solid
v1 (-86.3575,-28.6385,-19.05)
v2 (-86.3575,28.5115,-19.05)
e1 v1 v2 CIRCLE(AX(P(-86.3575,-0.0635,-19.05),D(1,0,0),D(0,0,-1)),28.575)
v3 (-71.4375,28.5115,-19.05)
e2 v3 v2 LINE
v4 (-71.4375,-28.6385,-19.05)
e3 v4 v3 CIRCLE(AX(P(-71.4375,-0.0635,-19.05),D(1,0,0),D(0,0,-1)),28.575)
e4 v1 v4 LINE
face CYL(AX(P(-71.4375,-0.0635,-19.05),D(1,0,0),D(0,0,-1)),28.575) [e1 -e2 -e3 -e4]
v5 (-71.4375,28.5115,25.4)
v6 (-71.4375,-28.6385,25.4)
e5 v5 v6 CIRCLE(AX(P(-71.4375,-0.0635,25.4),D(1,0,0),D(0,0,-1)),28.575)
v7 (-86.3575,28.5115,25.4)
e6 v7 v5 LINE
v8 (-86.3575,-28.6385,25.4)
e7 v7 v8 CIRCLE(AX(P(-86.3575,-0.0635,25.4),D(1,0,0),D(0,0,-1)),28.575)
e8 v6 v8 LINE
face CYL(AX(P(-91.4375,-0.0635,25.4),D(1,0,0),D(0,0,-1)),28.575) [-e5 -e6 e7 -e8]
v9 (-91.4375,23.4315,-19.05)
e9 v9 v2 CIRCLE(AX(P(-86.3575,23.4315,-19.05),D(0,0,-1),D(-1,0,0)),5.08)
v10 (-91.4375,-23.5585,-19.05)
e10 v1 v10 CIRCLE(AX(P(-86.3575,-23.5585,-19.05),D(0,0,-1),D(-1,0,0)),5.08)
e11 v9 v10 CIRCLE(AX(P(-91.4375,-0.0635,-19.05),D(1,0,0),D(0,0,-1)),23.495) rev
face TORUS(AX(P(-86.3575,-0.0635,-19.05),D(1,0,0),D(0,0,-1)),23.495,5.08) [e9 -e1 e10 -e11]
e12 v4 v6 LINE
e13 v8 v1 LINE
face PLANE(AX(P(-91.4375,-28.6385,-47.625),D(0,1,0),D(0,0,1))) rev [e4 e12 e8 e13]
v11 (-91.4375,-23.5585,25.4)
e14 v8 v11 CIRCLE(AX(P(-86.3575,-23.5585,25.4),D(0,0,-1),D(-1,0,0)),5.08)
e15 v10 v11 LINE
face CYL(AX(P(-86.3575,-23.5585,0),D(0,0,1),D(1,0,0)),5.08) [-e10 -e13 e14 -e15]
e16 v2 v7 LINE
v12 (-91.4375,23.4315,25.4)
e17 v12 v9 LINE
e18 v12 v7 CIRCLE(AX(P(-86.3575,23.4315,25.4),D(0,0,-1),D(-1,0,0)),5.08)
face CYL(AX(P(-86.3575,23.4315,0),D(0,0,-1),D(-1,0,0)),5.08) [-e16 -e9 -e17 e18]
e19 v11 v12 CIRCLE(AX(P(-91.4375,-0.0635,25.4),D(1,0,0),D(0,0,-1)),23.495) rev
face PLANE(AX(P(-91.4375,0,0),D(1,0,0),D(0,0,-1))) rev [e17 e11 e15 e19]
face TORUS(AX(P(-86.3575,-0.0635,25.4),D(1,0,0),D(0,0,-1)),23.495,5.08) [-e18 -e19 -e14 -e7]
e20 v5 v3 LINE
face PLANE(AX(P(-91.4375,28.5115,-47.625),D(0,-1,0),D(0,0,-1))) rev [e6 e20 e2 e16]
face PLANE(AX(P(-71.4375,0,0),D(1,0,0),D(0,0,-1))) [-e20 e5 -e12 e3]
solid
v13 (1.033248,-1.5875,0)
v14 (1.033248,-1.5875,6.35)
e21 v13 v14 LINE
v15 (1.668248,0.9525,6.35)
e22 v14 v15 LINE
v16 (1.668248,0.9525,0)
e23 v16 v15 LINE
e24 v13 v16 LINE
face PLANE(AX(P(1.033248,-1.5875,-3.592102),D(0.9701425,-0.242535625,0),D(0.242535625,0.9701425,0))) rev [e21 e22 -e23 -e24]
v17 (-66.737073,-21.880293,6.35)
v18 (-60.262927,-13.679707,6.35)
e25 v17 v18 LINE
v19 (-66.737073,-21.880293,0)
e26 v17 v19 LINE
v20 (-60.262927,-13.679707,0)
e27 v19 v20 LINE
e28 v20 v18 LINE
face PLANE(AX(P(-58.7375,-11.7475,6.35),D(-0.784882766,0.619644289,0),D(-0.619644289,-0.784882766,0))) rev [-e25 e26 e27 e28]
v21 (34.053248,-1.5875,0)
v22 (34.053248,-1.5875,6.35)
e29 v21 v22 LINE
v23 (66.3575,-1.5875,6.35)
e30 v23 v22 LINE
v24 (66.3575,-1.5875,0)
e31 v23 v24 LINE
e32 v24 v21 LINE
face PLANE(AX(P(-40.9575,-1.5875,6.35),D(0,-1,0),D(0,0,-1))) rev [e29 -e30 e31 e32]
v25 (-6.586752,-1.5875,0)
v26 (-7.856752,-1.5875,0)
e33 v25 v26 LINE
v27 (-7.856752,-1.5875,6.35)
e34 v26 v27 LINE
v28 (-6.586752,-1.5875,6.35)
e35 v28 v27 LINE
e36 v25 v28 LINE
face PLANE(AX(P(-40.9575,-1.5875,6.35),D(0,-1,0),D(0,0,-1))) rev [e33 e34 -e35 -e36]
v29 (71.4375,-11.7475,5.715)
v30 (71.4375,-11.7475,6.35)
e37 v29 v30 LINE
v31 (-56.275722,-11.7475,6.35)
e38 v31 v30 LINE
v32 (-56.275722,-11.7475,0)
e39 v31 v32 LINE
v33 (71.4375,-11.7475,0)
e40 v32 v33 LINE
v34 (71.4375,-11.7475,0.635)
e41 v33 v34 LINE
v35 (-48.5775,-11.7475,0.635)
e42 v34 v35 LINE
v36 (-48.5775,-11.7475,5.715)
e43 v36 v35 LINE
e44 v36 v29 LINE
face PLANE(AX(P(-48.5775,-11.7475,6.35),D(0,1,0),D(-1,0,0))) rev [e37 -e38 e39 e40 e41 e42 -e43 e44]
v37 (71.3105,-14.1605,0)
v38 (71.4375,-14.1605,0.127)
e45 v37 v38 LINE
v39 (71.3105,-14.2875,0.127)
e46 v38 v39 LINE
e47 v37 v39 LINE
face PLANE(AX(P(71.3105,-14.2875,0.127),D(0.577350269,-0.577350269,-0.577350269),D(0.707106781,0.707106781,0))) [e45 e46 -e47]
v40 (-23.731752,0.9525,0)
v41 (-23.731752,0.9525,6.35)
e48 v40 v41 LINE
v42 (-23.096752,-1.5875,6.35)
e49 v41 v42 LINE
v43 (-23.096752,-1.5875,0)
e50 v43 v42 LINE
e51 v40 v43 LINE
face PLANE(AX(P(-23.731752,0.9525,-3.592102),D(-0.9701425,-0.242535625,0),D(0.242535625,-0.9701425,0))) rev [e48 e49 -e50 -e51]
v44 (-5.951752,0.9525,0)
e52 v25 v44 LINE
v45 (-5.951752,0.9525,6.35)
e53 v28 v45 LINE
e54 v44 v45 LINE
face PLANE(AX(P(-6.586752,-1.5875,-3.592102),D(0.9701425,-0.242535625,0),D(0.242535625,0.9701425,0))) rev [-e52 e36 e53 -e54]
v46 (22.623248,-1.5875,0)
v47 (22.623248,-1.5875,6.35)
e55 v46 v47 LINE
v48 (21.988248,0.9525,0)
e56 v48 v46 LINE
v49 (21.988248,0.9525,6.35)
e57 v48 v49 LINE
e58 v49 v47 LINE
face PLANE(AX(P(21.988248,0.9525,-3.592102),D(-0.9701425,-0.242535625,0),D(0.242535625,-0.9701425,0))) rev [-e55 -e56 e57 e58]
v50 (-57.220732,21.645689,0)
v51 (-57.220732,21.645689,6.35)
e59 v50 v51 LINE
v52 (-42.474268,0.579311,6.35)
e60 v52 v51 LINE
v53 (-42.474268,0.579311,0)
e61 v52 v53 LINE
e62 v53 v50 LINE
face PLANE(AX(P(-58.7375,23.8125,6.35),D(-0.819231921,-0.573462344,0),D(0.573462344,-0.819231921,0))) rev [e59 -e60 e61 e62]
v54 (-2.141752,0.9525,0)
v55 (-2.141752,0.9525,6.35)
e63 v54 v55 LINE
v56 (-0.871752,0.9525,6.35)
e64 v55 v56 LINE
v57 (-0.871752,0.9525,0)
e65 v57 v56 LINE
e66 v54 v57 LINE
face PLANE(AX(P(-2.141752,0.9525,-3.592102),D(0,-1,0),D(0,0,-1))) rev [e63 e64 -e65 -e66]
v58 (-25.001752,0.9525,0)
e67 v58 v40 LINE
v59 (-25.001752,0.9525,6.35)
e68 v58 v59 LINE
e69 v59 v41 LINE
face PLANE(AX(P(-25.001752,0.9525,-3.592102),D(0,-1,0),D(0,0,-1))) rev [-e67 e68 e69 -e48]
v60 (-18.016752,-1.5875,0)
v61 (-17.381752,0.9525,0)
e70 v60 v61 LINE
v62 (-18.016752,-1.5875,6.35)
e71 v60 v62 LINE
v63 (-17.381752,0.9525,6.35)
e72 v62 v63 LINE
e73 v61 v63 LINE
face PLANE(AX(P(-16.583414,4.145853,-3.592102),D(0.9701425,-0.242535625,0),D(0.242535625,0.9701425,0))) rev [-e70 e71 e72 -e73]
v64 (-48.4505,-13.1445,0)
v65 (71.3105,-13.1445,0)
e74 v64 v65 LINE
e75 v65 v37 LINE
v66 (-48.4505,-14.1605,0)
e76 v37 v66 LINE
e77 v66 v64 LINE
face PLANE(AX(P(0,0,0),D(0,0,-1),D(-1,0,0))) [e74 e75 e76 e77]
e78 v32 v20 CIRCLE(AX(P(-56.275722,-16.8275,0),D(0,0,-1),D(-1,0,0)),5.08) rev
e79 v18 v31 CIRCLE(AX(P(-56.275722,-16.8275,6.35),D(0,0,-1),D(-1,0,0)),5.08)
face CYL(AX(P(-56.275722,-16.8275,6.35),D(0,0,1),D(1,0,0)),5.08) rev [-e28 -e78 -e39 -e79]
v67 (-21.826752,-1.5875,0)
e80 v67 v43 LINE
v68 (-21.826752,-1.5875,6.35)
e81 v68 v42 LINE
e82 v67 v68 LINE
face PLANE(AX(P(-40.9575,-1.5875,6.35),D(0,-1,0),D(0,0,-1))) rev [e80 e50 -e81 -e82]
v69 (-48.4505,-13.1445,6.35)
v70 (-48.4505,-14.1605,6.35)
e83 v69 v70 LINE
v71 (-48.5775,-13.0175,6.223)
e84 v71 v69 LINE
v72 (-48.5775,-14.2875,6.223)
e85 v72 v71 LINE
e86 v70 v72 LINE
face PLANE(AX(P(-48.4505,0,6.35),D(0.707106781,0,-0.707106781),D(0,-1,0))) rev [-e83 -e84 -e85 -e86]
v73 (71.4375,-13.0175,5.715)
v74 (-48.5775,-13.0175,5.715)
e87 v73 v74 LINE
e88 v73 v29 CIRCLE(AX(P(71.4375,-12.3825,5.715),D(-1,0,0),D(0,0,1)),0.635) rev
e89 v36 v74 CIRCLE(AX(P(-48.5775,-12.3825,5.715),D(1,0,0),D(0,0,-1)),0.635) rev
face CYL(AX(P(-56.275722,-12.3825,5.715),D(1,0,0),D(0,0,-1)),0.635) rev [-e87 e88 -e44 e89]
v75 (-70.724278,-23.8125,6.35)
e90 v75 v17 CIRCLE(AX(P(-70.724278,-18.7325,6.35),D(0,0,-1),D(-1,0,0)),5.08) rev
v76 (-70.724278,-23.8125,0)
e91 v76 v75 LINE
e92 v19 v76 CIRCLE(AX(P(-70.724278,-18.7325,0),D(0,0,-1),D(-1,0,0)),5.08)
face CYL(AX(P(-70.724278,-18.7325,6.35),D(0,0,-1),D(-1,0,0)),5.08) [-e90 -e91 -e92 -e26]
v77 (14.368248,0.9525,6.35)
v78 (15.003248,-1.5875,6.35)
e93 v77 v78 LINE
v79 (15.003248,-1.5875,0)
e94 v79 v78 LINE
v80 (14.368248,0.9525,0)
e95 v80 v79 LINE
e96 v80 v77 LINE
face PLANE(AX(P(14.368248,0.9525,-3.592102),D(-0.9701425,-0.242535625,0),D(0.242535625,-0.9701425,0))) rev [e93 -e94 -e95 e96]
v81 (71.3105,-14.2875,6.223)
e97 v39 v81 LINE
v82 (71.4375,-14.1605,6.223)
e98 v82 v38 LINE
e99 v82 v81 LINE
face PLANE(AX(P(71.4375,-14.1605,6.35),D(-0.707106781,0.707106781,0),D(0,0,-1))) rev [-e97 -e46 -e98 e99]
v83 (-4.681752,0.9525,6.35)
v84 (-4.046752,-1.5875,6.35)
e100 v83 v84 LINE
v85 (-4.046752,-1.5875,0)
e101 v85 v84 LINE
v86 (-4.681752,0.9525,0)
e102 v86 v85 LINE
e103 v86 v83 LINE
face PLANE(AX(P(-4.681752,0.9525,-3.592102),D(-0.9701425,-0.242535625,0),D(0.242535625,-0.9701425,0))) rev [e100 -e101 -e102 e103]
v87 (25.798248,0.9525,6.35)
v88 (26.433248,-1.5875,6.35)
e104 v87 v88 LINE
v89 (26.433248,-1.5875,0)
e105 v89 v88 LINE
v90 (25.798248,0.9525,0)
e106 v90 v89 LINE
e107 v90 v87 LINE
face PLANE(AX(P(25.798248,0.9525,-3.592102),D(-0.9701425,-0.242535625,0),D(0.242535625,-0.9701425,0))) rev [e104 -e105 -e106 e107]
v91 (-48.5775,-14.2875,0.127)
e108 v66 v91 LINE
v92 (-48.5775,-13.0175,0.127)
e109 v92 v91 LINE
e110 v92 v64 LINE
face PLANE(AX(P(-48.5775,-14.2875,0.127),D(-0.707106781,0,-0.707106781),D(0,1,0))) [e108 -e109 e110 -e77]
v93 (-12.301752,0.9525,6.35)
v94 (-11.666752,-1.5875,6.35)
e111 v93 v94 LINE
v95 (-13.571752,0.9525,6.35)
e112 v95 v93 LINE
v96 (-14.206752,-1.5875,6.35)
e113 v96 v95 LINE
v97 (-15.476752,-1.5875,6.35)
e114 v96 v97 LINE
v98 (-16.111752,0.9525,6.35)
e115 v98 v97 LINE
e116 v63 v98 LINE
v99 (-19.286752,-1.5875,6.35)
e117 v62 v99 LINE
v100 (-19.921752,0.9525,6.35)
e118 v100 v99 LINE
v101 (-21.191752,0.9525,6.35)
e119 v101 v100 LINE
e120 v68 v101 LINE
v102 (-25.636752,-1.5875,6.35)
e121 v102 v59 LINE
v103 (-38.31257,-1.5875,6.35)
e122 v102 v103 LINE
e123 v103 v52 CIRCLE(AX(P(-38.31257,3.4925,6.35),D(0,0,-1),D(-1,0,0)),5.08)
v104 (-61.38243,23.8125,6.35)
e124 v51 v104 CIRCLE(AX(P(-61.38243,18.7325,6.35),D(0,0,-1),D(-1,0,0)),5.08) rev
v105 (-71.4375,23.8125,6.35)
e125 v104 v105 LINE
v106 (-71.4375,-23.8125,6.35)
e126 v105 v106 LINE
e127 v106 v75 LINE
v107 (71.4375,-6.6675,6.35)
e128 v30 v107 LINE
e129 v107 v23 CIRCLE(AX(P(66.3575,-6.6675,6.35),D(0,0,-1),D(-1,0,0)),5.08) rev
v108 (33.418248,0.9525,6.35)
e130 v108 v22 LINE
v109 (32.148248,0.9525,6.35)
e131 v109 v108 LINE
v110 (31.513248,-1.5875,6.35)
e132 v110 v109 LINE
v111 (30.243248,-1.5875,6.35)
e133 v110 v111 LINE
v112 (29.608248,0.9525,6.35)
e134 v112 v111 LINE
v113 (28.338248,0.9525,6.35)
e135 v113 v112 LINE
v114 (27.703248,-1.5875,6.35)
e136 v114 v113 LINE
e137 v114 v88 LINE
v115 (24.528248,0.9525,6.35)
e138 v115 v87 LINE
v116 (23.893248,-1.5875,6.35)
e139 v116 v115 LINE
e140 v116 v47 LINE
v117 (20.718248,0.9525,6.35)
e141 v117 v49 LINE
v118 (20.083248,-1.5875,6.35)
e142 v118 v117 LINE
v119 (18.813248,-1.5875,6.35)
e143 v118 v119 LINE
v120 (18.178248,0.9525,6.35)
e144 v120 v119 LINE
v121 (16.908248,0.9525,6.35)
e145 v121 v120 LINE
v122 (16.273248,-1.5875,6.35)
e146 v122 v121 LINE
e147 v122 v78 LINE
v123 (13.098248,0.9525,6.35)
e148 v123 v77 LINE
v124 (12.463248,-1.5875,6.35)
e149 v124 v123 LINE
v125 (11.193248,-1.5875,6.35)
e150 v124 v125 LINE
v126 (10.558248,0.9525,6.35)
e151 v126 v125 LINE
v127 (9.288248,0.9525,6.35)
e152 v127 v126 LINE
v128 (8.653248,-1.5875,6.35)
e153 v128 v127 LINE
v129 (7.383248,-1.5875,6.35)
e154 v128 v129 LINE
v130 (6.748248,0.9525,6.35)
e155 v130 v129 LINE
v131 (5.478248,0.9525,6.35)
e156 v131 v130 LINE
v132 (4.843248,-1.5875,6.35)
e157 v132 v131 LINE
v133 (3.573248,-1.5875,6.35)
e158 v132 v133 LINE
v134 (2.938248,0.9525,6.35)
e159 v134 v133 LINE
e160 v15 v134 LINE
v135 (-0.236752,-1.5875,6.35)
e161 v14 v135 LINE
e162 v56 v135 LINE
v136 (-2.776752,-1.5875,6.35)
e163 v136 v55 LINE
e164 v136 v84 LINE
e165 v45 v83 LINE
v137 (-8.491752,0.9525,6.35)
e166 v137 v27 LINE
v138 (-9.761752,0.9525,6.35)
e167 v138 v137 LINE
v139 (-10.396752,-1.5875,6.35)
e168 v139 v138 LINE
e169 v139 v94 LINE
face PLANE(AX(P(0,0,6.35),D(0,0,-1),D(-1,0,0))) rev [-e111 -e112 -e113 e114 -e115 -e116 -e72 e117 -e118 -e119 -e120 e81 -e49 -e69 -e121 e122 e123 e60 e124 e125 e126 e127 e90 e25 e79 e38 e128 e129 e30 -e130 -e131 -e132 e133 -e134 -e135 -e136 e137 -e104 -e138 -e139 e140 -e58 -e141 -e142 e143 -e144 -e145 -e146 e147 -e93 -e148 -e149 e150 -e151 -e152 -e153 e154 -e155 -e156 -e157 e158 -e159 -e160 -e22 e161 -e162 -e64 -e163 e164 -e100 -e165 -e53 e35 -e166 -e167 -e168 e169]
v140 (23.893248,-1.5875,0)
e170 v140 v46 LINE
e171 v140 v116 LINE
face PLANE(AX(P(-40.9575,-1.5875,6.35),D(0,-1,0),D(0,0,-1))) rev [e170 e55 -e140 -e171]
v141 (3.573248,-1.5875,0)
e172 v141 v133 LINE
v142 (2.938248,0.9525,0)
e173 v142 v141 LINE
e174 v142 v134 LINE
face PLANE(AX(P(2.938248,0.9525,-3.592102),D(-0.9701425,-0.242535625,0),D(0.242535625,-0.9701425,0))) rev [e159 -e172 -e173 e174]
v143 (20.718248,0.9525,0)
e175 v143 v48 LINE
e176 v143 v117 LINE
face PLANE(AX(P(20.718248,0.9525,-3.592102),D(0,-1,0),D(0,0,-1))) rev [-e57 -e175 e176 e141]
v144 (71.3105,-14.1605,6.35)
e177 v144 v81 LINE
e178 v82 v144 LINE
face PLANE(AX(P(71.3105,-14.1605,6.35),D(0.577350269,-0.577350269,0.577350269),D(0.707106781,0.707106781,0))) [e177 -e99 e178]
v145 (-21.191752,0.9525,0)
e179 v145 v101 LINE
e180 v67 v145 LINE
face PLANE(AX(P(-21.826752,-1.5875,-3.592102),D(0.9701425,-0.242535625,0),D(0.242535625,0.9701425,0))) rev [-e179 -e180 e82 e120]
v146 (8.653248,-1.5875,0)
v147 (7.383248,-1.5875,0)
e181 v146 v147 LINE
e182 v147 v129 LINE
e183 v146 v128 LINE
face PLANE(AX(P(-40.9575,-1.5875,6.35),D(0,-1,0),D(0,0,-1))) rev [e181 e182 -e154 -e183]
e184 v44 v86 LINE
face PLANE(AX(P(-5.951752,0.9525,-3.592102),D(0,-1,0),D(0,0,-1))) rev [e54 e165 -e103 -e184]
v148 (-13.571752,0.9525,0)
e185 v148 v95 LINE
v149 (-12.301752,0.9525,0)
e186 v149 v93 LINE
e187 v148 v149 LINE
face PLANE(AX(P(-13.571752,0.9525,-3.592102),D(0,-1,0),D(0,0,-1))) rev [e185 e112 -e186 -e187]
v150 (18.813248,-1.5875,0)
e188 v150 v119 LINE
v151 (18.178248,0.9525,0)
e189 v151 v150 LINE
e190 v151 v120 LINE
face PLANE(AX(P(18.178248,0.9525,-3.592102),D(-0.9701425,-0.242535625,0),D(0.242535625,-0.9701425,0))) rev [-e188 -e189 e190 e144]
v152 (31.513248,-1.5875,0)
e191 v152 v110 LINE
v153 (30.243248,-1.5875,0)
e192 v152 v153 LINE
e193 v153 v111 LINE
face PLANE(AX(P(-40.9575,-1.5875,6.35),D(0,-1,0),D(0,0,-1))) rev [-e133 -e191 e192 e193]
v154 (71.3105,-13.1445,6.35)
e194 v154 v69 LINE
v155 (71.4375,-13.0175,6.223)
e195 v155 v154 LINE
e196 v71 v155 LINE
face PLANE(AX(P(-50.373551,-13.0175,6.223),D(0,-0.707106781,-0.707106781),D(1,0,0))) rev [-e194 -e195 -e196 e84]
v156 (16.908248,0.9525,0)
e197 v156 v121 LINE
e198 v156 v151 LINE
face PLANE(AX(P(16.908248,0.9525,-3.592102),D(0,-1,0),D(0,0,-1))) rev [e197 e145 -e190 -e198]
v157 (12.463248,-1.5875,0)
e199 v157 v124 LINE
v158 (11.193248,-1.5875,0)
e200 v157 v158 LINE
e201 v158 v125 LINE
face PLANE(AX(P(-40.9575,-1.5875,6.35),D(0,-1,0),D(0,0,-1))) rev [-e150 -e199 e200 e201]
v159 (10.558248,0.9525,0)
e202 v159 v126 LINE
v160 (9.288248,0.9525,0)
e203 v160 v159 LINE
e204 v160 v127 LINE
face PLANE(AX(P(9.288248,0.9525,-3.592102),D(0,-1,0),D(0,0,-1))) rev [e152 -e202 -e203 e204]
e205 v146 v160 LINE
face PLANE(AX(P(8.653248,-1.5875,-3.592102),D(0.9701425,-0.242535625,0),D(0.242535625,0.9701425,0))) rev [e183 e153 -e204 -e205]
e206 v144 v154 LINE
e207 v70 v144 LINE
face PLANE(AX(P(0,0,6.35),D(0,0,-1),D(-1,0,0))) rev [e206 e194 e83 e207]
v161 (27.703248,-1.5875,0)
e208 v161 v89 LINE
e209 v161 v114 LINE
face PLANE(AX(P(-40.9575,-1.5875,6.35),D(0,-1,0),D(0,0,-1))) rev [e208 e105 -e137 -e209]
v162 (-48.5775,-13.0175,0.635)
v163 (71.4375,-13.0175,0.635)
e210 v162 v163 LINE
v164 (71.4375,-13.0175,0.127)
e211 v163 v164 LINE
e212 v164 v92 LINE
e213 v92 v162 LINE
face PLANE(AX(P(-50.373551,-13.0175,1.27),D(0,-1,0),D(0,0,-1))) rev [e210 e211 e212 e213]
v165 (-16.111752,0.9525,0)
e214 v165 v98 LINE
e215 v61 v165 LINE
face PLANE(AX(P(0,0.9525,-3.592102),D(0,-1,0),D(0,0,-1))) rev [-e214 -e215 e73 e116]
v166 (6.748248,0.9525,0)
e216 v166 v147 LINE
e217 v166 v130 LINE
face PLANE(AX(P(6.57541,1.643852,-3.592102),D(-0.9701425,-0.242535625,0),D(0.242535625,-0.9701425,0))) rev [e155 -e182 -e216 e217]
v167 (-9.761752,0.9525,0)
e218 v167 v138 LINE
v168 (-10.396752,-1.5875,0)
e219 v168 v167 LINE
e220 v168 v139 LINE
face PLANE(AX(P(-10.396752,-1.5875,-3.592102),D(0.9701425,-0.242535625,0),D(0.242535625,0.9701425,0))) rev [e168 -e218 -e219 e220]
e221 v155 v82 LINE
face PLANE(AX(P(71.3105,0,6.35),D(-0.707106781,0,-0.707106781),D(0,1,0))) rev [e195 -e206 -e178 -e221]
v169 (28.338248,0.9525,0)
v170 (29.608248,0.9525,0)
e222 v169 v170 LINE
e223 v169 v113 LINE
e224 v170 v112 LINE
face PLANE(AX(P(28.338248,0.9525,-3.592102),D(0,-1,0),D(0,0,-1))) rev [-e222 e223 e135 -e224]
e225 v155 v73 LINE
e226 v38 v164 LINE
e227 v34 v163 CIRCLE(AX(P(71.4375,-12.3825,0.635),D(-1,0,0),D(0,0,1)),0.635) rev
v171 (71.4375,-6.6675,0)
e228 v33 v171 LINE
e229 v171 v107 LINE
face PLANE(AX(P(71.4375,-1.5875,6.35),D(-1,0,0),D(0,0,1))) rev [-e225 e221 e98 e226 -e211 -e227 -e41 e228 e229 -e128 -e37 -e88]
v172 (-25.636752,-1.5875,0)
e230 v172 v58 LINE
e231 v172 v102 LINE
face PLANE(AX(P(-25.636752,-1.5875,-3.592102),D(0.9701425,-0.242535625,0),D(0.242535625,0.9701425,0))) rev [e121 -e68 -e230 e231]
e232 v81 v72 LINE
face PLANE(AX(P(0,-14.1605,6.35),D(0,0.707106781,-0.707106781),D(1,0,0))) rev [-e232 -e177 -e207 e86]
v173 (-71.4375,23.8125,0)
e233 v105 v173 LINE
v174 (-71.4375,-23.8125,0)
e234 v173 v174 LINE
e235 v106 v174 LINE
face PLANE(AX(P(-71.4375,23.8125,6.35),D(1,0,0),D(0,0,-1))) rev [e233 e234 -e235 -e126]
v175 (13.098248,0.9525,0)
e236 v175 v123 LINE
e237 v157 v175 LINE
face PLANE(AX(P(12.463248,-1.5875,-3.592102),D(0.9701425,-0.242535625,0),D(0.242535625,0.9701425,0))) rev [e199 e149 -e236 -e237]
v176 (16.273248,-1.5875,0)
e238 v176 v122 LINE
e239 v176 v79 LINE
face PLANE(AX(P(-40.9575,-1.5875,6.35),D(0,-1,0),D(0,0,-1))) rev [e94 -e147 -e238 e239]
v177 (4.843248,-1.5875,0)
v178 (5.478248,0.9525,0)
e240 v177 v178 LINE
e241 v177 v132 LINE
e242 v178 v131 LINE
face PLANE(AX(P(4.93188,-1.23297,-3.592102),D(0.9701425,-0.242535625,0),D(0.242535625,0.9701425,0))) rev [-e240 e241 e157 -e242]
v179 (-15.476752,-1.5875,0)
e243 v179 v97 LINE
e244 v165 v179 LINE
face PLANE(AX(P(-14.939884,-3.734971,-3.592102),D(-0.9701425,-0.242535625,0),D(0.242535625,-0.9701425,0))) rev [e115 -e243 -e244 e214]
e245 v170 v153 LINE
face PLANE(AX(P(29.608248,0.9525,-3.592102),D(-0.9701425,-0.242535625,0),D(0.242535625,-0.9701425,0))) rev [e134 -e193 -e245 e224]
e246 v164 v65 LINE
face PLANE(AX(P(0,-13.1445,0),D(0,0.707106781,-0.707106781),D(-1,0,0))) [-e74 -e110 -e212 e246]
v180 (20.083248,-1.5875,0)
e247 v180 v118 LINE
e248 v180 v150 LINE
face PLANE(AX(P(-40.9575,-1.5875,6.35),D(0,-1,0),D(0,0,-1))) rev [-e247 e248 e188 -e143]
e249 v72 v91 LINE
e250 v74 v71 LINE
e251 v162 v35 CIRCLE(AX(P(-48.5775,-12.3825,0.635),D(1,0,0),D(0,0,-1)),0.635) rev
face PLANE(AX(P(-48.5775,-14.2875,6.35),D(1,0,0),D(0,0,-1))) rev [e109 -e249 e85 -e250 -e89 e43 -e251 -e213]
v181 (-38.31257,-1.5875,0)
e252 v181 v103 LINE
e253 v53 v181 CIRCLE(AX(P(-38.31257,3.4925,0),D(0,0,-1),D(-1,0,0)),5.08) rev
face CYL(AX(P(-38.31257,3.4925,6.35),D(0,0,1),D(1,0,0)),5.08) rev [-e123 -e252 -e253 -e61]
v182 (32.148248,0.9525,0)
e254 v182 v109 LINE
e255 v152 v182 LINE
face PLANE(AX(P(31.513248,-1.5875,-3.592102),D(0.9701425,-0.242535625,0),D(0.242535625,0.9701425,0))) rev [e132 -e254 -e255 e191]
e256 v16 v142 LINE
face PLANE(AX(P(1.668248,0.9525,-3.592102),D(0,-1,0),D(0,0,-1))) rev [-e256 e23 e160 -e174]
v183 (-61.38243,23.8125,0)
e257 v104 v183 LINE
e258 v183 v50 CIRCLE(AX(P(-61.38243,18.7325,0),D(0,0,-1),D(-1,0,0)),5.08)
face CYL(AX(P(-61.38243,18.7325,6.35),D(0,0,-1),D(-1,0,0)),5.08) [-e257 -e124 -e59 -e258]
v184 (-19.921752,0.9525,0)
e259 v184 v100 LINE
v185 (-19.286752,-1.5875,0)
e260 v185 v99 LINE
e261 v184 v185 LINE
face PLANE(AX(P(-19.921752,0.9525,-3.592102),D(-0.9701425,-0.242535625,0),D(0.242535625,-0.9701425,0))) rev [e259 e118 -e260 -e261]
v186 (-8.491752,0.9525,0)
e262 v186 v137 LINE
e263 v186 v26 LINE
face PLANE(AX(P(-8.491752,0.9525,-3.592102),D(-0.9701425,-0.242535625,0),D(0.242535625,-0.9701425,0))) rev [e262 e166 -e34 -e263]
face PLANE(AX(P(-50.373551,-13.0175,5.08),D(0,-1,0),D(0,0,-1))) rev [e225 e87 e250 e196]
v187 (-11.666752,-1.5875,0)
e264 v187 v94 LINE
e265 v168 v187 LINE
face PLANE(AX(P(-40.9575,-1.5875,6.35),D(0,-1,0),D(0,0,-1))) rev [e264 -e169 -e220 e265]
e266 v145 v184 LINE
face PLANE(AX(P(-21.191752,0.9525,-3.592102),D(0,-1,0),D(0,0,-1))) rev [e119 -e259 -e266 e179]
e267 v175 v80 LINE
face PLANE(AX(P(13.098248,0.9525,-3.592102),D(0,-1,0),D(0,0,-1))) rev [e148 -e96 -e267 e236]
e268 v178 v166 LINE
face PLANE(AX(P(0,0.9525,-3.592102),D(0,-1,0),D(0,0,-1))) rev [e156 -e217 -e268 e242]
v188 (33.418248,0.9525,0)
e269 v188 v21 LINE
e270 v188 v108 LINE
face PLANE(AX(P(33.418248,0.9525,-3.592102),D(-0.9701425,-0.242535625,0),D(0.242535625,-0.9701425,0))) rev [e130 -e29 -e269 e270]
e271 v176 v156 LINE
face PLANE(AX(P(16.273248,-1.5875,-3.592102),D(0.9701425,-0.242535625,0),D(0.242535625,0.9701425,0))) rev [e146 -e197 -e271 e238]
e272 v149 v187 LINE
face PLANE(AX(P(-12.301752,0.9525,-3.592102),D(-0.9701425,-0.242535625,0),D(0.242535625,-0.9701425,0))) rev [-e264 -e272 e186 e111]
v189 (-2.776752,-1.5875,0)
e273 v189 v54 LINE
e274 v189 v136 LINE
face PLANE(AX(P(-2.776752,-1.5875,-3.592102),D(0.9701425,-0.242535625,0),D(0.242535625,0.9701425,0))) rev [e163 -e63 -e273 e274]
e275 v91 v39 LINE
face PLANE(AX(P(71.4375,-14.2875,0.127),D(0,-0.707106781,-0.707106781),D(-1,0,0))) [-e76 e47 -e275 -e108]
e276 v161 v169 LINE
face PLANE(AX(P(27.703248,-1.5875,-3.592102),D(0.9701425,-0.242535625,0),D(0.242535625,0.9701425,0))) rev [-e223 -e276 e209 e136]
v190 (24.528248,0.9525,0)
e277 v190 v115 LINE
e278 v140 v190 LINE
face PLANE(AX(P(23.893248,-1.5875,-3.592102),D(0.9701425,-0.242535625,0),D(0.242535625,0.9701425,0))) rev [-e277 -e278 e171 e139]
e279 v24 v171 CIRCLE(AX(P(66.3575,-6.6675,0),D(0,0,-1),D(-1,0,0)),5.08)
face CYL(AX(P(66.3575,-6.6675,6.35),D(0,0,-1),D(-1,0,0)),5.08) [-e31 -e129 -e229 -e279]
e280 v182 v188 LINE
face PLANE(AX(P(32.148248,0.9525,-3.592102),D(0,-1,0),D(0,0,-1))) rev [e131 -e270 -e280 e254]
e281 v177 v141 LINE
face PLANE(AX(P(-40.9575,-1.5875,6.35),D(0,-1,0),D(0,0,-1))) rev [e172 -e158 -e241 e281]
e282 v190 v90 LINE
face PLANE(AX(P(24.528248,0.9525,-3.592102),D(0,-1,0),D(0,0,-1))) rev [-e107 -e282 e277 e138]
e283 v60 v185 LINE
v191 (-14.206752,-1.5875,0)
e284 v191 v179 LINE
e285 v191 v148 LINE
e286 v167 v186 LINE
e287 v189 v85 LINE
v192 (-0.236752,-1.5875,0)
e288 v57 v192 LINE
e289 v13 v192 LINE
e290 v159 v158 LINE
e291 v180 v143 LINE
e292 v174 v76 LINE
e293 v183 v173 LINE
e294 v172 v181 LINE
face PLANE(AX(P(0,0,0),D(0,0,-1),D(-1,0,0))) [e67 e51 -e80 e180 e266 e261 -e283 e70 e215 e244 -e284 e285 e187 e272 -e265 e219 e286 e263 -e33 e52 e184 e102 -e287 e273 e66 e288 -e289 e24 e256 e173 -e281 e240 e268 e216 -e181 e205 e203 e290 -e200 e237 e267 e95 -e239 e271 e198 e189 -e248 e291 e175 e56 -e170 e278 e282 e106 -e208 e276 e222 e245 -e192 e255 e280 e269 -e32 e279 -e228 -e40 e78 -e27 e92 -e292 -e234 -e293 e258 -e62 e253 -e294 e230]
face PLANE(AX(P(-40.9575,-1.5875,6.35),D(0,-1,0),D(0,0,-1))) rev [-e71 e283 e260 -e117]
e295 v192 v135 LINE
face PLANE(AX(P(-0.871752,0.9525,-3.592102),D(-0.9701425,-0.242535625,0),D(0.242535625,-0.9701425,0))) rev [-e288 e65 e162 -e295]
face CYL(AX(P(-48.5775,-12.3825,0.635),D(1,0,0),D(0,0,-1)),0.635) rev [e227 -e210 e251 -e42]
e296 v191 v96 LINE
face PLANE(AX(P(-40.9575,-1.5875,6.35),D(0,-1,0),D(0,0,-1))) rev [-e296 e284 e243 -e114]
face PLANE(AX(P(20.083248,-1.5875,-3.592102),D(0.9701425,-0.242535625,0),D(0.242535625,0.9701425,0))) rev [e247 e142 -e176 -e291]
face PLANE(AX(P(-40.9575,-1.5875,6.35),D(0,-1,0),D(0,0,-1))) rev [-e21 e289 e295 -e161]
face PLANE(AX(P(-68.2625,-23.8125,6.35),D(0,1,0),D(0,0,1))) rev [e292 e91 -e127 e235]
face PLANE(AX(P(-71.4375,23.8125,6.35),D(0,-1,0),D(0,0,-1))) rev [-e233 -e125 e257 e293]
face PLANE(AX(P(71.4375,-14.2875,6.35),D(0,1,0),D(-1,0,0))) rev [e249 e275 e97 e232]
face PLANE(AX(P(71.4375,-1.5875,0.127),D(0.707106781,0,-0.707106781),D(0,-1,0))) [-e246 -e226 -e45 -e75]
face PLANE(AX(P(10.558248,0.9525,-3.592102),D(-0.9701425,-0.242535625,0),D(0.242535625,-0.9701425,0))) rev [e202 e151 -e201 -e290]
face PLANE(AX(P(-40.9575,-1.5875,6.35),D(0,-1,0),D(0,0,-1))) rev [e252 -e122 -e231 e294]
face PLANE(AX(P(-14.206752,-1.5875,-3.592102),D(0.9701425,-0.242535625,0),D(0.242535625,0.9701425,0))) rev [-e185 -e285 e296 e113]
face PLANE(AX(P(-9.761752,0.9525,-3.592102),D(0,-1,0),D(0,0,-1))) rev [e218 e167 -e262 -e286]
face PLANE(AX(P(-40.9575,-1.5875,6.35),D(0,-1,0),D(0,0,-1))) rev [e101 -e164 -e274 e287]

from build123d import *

# Parameters (mm, degrees)
BOSS_EXTRUDE1_DEPTH = 6.35
FILLET1_R           = 5.08
FILLET2_R           = 5.08
FILLET3_R           = 5.08
SKETCH2_W           = 1.27
SKETCH2_H           = 1.27
CUT_EXTRUDE1_DEPTH  = 120.015
FILLET5_R           = 0.635
FILLET6_R           = 0.635
CHAMFER1_SIZE       = 0.127
BOSS_EXTRUDE2_DEPTH = 6.35
SKETCH4_W           = 101.6
SKETCH4_H           = 57.15
BOSS_EXTRUDE3_DEPTH = 20
FILLET7_RADIUS      = 28.575
FILLET7_LENGTH      = 20
FILLET8_RADIUS      = 28.575
FILLET8_LENGTH      = 20
FILLET9_R           = 5.08


with BuildPart() as part:
    # Sketch1 → Boss-Extrude1 (new body)
    with BuildSketch(Plane.XY):
        Polygon((-71.4375, 23.8125), (-58.7375, 23.8125), (-40.9575, -1.5875), (71.4375, -1.5875), (71.4375, -14.2875), (-48.5775, -14.2875), (-48.5775, -11.7475), (-58.7375, -11.7475), (-68.2625, -23.8125), (-71.4375, -23.8125), align=None)
    extrude(amount=BOSS_EXTRUDE1_DEPTH)

    # Fillet1
    fillet1_edges = [part.edges().sort_by_distance(p)[0] for p in [
        (-58.7375, 23.8125, 3.175),
    ]]
    fillet(fillet1_edges, radius=FILLET1_R)

    # Fillet2
    fillet2_edges = [part.edges().sort_by_distance(p)[0] for p in [
        (-40.9575, -1.5875, 3.175),
        (-58.7375, -11.7475, 3.175),
        (-68.2625, -23.8125, 3.175),
    ]]
    fillet(fillet2_edges, radius=FILLET2_R)

    # Fillet3
    fillet3_edges = [part.edges().sort_by_distance(p)[0] for p in [
        (71.4375, -1.5875, 3.175),
    ]]
    fillet(fillet3_edges, radius=FILLET3_R)

    # Sketch2 → Cut-Extrude1 (cut)
    with BuildSketch(Plane(origin=(71.4375, 0, 0), x_dir=(0, 0, -1), z_dir=(1, 0, 0))):
        with Locations((-5.715, -12.3825)):
            Rectangle(SKETCH2_W, SKETCH2_H)
        with Locations((-0.635, -12.3825)):
            Rectangle(SKETCH2_W, SKETCH2_H)
    extrude(amount=-CUT_EXTRUDE1_DEPTH, mode=Mode.SUBTRACT)

    # Fillet5
    fillet5_edges = [part.edges().sort_by_distance(p)[0] for p in [
        (11.43, -11.7475, 1.27),
        (11.43, -13.0175, 1.27),
    ]]
    fillet(fillet5_edges, radius=FILLET5_R - 0.0001)  # a hair under: the kernel refuses the full size

    # Fillet6
    fillet6_edges = [part.edges().sort_by_distance(p)[0] for p in [
        (11.43, -11.7475, 5.08),
        (11.43, -13.0175, 5.08),
    ]]
    fillet(fillet6_edges, radius=FILLET6_R - 0.0001)  # a hair under: the kernel refuses the full size

    # Chamfer1
    chamfer1_edges = [part.edges().sort_by_distance(p)[0] for p in [
        (71.4375, -13.6525, 0),
        (11.43, -14.2875, 0),
        (71.4375, -14.2875, 3.175),
        (11.43, -14.2875, 6.35),
        (71.4375, -13.6525, 6.35),
        (-48.5775, -13.6525, 0),
        (-48.5775, -13.6525, 6.35),
        (11.43, -13.0175, 6.35),
        (11.43, -13.0175, 0),
    ]]
    chamfer(chamfer1_edges, length=CHAMFER1_SIZE)

    # Sketch3 → Boss-Extrude2 (add)
    with BuildSketch(Plane.XY.offset(6.35)):
        Polygon((-18.01675216, -1.5875), (-15.47675216, -1.5875), (-16.11175216, 0.9525), (-17.38175216, 0.9525), align=None)
        Polygon((5.47824784, 0.9525), (4.84324784, -1.5875), (7.38324784, -1.5875), (6.74824784, 0.9525), align=None)
        Polygon((-25.63675216, -1.5875), (-25.00175216, 0.9525), (-23.73175216, 0.9525), (-23.09675216, -1.5875), align=None)
        Polygon((-21.82675216, -1.5875), (-21.19175216, 0.9525), (-19.92175216, 0.9525), (-19.28675216, -1.5875), align=None)
        Polygon((-12.30175216, 0.9525), (-11.66675216, -1.5875), (-14.20675216, -1.5875), (-13.57175216, 0.9525), align=None)
        Polygon((-8.49175216, 0.9525), (-7.85675216, -1.5875), (-10.39675216, -1.5875), (-9.76175216, 0.9525), align=None)
        Polygon((-4.68175216, 0.9525), (-4.04675216, -1.5875), (-6.58675216, -1.5875), (-5.95175216, 0.9525), align=None)
        Polygon((-2.77675216, -1.5875), (-2.14175216, 0.9525), (-0.87175216, 0.9525), (-0.23675216, -1.5875), align=None)
        Polygon((2.93824784, 0.9525), (3.57324784, -1.5875), (1.03324784, -1.5875), (1.66824784, 0.9525), align=None)
        Polygon((10.55824784, 0.9525), (11.19324784, -1.5875), (8.65324784, -1.5875), (9.28824784, 0.9525), align=None)
        Polygon((14.36824784, 0.9525), (15.00324784, -1.5875), (12.46324784, -1.5875), (13.09824784, 0.9525), align=None)
        Polygon((18.17824784, 0.9525), (18.81324784, -1.5875), (16.27324784, -1.5875), (16.90824784, 0.9525), align=None)
        Polygon((21.98824784, 0.9525), (22.62324784, -1.5875), (20.08324784, -1.5875), (20.71824784, 0.9525), align=None)
        Polygon((25.79824784, 0.9525), (26.43324784, -1.5875), (23.89324784, -1.5875), (24.52824784, 0.9525), align=None)
        Polygon((27.70324784, -1.5875), (28.33824784, 0.9525), (29.60824784, 0.9525), (30.24324784, -1.5875), align=None)
        Polygon((33.41824784, 0.9525), (34.05324784, -1.5875), (31.51324784, -1.5875), (32.14824784, 0.9525), align=None)
    extrude(amount=-BOSS_EXTRUDE2_DEPTH)


with BuildPart() as body_2:
    # Sketch4 → Boss-Extrude3 (new body)
    with BuildSketch(Plane.ZY.offset(71.4375)):
        with Locations((3.175, -0.0635)):
            Rectangle(SKETCH4_W, SKETCH4_H)
    extrude(amount=BOSS_EXTRUDE3_DEPTH)

    # Fillet7: full round fillet: the end face becomes a half cylinder, R = half its width
    fillet7_face = Plane((-81.4375, -0.0635, -47.625), x_dir=(-1, 0, 0), z_dir=(0, 0, -1))  # on the end face: x along it, z out of the body
    fillet7_slab = fillet7_face.offset(-FILLET7_RADIUS / 2) * Box(FILLET7_LENGTH, 2 * FILLET7_RADIUS, FILLET7_RADIUS, mode=Mode.PRIVATE)  # the body's end, R deep
    fillet7_round = Plane((-81.4375, -0.0635, -19.05), x_dir=(0, 0, -1), z_dir=(-1, 0, 0)) * Cylinder(FILLET7_RADIUS, FILLET7_LENGTH, mode=Mode.PRIVATE)  # its axis R under the face
    add(fillet7_slab - fillet7_round, mode=Mode.SUBTRACT)

    # Fillet8: full round fillet: the end face becomes a half cylinder, R = half its width
    fillet8_face = Plane((-81.4375, -0.0635, 53.975), x_dir=(1, 0, 0), z_dir=(0, 0, 1))  # on the end face: x along it, z out of the body
    fillet8_slab = fillet8_face.offset(-FILLET8_RADIUS / 2) * Box(FILLET8_LENGTH, 2 * FILLET8_RADIUS, FILLET8_RADIUS, mode=Mode.PRIVATE)  # the body's end, R deep
    fillet8_round = Plane((-81.4375, -0.0635, 25.4), x_dir=(0, 0, 1), z_dir=(1, 0, 0)) * Cylinder(FILLET8_RADIUS, FILLET8_LENGTH, mode=Mode.PRIVATE)  # its axis R under the face
    add(fillet8_slab - fillet8_round, mode=Mode.SUBTRACT)

    # Fillet9
    fillet9_edges = [body_2.edges().sort_by_distance(p)[0] for p in [
        (-91.4375, -28.6385, 3.175),
        (-91.4375, -0.0635, -47.625),
        (-91.4375, 28.5115, 3.175),
        (-91.4375, -0.0635, 53.975),
    ]]
    fillet(fillet9_edges, radius=FILLET9_R)


solid = Compound([part.part, body_2.part])
